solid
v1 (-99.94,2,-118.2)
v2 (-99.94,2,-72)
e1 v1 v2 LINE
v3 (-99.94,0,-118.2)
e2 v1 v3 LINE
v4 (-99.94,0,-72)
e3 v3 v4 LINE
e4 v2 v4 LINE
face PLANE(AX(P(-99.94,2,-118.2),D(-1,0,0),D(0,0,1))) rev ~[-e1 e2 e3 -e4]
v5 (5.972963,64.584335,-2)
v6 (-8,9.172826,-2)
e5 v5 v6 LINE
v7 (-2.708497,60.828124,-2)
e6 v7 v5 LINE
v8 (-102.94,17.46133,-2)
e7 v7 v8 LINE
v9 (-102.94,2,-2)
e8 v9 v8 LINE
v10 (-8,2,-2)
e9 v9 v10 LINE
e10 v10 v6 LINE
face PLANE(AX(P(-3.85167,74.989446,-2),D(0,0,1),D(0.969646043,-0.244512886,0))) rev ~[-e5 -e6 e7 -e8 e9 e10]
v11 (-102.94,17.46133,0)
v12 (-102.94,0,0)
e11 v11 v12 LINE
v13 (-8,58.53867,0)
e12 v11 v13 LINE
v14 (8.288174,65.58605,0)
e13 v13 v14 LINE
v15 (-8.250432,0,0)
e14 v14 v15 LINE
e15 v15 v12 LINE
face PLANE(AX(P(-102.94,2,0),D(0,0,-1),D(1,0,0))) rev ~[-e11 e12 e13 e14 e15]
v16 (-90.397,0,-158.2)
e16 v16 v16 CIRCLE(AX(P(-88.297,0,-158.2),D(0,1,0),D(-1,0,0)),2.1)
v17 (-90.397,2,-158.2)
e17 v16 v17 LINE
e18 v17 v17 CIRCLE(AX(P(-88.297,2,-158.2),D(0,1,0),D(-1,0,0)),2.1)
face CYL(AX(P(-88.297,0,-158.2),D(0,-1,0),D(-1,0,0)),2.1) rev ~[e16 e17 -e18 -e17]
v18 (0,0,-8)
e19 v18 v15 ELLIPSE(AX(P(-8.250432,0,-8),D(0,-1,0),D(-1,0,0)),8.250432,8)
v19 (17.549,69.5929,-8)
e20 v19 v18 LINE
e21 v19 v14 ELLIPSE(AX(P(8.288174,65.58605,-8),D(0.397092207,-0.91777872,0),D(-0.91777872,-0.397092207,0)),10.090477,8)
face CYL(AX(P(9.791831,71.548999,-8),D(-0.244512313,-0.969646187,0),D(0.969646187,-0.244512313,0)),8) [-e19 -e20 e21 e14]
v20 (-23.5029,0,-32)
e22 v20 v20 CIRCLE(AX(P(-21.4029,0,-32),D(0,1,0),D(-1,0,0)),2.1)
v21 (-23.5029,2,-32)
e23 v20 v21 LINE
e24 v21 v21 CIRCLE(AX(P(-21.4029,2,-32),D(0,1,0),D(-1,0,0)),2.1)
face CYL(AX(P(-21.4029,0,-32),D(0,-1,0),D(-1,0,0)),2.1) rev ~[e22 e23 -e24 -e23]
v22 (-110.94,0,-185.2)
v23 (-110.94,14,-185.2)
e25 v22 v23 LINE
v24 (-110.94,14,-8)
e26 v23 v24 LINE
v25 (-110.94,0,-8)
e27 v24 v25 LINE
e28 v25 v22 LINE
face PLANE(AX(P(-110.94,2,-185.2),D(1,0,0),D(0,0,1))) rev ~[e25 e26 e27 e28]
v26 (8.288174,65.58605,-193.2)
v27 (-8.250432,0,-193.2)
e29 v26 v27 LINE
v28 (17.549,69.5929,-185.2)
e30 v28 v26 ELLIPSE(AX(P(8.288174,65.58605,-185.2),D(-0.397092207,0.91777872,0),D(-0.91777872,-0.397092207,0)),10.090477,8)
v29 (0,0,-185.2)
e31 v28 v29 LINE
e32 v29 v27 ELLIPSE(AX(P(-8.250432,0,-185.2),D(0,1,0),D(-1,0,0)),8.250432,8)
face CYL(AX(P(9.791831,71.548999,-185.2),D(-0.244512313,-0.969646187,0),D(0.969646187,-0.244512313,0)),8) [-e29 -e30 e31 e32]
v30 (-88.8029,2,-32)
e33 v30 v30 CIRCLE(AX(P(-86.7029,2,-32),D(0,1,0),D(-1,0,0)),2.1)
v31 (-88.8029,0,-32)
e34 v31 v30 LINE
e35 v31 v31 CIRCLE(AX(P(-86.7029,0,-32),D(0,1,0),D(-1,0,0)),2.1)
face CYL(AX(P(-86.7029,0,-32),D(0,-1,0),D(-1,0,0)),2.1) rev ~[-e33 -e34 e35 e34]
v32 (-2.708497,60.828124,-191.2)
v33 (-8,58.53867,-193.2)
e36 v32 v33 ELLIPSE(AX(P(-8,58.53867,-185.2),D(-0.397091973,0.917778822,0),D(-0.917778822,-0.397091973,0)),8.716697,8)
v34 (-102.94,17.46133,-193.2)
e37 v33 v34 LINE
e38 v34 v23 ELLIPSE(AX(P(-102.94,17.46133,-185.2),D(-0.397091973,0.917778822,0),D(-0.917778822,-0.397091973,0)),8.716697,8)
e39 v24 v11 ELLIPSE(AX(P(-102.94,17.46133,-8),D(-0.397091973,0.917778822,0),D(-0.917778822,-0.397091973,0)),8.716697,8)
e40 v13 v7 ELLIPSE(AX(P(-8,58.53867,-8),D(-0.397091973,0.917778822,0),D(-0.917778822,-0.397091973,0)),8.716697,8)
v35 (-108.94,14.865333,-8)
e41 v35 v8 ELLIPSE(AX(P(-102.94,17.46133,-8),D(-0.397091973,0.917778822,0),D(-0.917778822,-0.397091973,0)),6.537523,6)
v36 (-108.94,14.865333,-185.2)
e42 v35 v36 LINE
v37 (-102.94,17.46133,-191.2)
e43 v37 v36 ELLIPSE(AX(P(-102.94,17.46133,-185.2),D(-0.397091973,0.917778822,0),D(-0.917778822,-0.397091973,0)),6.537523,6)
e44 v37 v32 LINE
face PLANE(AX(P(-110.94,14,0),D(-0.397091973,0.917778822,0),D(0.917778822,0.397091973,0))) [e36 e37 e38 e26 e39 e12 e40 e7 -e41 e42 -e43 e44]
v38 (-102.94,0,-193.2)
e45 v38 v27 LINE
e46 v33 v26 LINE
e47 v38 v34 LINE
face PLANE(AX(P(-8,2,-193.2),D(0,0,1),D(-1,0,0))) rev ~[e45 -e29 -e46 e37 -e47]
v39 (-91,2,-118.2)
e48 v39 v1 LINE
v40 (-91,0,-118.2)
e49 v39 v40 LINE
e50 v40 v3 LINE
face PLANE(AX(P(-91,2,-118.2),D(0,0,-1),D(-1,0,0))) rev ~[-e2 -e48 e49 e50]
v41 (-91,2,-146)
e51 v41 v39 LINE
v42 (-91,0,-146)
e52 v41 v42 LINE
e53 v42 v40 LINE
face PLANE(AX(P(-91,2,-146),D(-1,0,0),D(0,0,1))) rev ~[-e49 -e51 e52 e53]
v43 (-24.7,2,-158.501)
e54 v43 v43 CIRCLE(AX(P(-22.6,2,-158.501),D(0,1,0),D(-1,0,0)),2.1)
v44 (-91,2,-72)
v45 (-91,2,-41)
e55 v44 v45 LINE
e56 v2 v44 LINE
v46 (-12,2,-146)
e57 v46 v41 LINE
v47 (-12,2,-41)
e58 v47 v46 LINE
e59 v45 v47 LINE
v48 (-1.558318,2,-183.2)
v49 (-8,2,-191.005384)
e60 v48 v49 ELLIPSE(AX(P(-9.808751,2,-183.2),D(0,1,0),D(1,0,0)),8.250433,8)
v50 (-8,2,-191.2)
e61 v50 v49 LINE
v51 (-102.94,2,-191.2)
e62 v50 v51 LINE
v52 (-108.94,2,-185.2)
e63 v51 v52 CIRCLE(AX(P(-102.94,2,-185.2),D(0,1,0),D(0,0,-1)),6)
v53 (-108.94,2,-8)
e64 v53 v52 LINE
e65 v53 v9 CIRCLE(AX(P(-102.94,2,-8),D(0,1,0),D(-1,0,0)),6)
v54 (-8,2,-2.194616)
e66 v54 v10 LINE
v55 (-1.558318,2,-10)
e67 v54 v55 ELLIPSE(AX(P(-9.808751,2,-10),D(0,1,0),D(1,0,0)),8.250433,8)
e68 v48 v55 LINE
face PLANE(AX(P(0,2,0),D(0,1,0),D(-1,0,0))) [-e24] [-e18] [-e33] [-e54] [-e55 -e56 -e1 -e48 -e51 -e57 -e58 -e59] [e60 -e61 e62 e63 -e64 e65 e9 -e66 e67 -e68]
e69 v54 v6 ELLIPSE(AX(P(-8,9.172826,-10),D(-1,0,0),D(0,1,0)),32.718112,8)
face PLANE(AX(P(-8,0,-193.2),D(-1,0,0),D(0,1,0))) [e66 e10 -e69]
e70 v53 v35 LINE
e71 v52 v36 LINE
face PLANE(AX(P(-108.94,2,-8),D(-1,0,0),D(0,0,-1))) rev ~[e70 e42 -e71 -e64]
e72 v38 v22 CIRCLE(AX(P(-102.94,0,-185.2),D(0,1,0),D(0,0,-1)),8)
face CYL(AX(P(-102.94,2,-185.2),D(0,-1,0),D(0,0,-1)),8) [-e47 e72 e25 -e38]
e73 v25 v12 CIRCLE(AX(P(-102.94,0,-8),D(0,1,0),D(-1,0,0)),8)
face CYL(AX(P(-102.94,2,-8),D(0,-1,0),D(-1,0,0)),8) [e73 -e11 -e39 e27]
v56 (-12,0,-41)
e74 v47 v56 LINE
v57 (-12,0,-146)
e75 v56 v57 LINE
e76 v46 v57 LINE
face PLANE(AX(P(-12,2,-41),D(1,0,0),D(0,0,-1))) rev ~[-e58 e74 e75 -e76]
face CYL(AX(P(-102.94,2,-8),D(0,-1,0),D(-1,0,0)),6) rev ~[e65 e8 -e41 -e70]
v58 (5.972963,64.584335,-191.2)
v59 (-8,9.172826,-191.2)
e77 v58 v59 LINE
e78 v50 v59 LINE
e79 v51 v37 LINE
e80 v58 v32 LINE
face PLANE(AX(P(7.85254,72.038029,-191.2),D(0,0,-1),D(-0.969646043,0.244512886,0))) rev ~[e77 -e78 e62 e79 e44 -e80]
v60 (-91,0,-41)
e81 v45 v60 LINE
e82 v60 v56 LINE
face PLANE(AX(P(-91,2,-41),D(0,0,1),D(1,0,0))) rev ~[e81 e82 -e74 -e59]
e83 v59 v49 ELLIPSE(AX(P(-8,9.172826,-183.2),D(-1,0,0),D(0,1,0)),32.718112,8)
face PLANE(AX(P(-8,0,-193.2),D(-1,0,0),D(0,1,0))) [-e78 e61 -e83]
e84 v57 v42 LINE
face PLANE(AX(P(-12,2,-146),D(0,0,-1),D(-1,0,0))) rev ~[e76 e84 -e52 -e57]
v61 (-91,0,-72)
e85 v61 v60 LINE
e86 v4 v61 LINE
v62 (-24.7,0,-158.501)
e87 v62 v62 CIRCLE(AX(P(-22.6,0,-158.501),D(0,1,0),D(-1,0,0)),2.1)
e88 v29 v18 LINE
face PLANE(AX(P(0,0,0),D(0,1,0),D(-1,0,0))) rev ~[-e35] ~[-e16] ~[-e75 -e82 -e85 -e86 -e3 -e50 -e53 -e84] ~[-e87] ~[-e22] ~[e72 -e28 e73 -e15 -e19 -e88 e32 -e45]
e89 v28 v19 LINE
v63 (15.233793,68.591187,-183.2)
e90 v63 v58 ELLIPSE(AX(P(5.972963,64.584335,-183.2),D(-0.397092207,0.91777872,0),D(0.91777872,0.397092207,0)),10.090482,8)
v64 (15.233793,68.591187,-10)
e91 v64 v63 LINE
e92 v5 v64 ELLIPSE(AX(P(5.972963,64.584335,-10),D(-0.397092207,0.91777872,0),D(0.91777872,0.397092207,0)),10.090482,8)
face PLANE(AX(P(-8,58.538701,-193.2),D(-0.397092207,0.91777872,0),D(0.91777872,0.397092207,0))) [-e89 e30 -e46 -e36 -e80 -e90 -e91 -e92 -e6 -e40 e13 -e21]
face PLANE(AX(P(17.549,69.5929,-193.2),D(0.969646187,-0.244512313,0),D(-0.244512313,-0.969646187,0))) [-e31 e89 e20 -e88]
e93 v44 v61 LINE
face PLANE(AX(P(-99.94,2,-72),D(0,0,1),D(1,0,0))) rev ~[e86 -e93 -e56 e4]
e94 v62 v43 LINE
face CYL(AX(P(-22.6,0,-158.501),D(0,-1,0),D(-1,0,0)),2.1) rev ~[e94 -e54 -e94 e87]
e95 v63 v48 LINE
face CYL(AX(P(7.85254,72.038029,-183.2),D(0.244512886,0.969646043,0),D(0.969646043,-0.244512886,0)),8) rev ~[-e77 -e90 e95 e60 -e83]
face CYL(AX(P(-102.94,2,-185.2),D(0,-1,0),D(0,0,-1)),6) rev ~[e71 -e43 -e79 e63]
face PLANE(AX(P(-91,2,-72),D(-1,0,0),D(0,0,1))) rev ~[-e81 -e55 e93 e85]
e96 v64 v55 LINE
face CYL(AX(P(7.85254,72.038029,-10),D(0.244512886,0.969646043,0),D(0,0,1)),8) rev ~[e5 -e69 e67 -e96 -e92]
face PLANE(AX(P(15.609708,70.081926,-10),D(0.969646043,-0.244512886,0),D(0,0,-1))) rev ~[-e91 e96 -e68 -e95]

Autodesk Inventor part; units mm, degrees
ref_plane "YZ Plane" through (0, 0, 0) normal (1, 0, 0) x (0, 1, 0)
ref_plane "XZ Plane" through (0, 0, 0) normal (0, 1, 0) x (-1, 0, 0)
sketch "Sketch1" plane through (0, 0, 0) normal (0, 1, 0) x (-1, 0, 0)
  line L0 (8, 0) -> (102.94, 0)
  line L1 (110.94, -8) -> (110.94, -185.2)
  line L2 (102.94, -193.2) -> (8, -193.2)
  line L3 (0, -185.2) -> (0, -8)
  circle A0 centre (86.7029, -32) radius 2.1
  circle A1 centre (88.297, -158.2) radius 2.1
  circle A2 centre (22.6, -158.501) radius 2.1
  circle A3 centre (21.4029, -32) radius 2.1
  arc A4 (110.94, -8) -> (102.94, 0) centre (102.94, -8) ccw
  arc A5 (8, 0) -> (0, -8) centre (8, -8) ccw
  arc A6 (0, -185.2) -> (8, -193.2) centre (8, -185.2) ccw
  arc A7 (102.94, -193.2) -> (110.94, -185.2) centre (102.94, -185.2) ccw
  point P0 (0, 0)
  dimension "d0" = 110.94
  dimension "d1" = 193.2
  dimension "d2" = 4.2
  dimension "d3" = 4.2
  dimension "d4" = 65.3
  dimension "d5" = 65.697
  dimension "d6" = 4.2
  dimension "d7" = 4.2
  dimension "d8" = 126.2
  dimension "d9" = 126.501
  dimension "d10" = 0
  dimension "d11" = 22.6
  dimension "d12" = 35
  dimension "d13" = 8
extrude "Extrusion1" add sketch "Sketch1" along normal blind 2
sketch "Sketch3" plane through (0, 2, 0) normal (0, 1, 0) x (1, 0, 0)
  line L0 (-91, 41) -> (-12, 41)
  line L1 (-12, 41) -> (-12, 146)
  line L2 (-12, 146) -> (-91, 146)
  line L3 (-99.94, 72) -> (-91, 72)
  line L4 (-91, 118.2) -> (-99.94, 118.2)
  line L5 (-99.94, 118.2) -> (-99.94, 72)
  circle A0 centre (-88.297, 158.2) radius 2.1 projected
  circle A1 centre (-86.7029, 32) radius 2.1 projected
  line L6 (-91, 146) -> (-91, 118.2)
  line L7 (-91, 72) -> (-91, 41)
  line L8 (-102.94, 0) -> (-8, 0) projected
  line L9 (0, 8) -> (0, 185.2) projected
  line L10 (-110.94, 185.2) -> (-110.94, 8) projected
  point P0 (0, 0)
  dimension "d22" = 105
  dimension "d26" = 40
  dimension "d27" = 40
  dimension "d32" = 12
  dimension "d33" = 41
  dimension "d34" = 11
  dimension "d35" = 79
  dimension "d36" = 79
extrude "Extrusion3" cut sketch "Sketch3" against normal blind 7.5 contours L7 L3 L5 L4 L6 L2 L1 L0
sketch "Sketch4" plane through (0, 2, 0) normal (0, 1, 0) x (1, 0, 0)
  line L0 (-91, 146) -> (-12, 146) projected
  line L1 (-12, 146) -> (-12, 41) projected
  line L2 (-12, 41) -> (-91, 41) projected
  line L3 (-91, 41) -> (-91, 72) projected
  line L4 (-91, 72) -> (-99.94, 72) projected
  line L5 (-99.94, 72) -> (-99.94, 118.2) projected
  line L6 (-99.94, 118.2) -> (-91, 118.2) projected
  line L7 (-91, 118.2) -> (-91, 146) projected
  line L8 (-8, 193.2) -> (-102.94, 193.2) projected
  arc A0 (-102.94, 193.2) -> (-110.94, 185.2) centre (-102.94, 185.2) ccw projected
  line L9 (-110.94, 185.2) -> (-110.94, 8) projected
  arc A1 (-110.94, 8) -> (-102.94, 0) centre (-102.94, 8) ccw projected
  line L10 (-102.94, 0) -> (-8, 0) projected
  arc A2 (-8, 0) -> (0, 8) centre (-8, 8) ccw projected
  line L11 (0, 8) -> (0, 185.2) projected
  arc A3 (0, 185.2) -> (-8, 193.2) centre (-8, 185.2) ccw projected
  circle A4 centre (-86.7029, 32) radius 2.1 projected
  circle A5 centre (-88.297, 158.2) radius 2.1 projected
  circle A6 centre (-22.6, 158.501) radius 2.1 projected
  circle A7 centre (-21.4029, 32) radius 2.1 projected
  arc A8 (-108.94, 8) -> (-102.94, 2) centre (-102.94, 8) ccw
  line L12 (-108.94, 8) -> (-108.94, 185.2)
  arc A9 (-102.94, 191.2) -> (-108.94, 185.2) centre (-102.94, 185.2) ccw
  line L13 (-102.94, 191.2) -> (-8, 191.2)
  arc A10 (-2, 185.2) -> (-8, 191.2) centre (-8, 185.2) ccw
  line L14 (-2, 185.2) -> (-2, 8)
  arc A11 (-8, 2) -> (-2, 8) centre (-8, 8) ccw
  line L15 (-8, 2) -> (-102.94, 2)
  point P0 (0, 0)
  dimension "d37" = 2
extrude "Extrusion4" add sketch "Sketch4" along normal blind 60 contours A3 L11 A2 L10 A1 L9 A0 L8
sketch "Sketch5" plane through (-102.94, 0, 0) normal (0, 0, 1) x (1, 0, 0)
  line L0 (-8, 0) -> (-8, 62) projected
  line L1 (-8, 14) -> (102.94, 62)
  line L2 (102.94, 0) -> (102.94, 62) projected
  line L3 (0, 0) -> (-8, 0) projected
  line L4 (0, 62) -> (-8, 62) projected
  line L5 (-8, 14) -> (-8, 62)
  line L6 (102.94, 62) -> (94.94, 62) projected
  line L7 (-8, 62) -> (102.94, 62)
  dimension "d40" = 14
  dimension "d41" = 0
extrude "Extrusion5" cut sketch "Sketch5" along normal mid plane 1000
sketch "Sketch6" plane through (-8, 0, -193.2) normal (0, 0, -1) x (-1, 0, 0)
  line L0 (102.94, 0) -> (102.94, 14) projected
  line L1 (102.94, 14) -> (-25.549, 69.5929)
  line L2 (94.94, 17.4613) -> (102.94, 14) projected
  line L3 (-25.549, 69.5929) -> (-8, 0)
  line L4 (0, 0) -> (-8, 0) projected
  line L5 (-8, 0) -> (0, 0)
  line L6 (0, 0) -> (0, 58.5387) projected
  line L7 (0, 0) -> (0, 58.5387)
  point P0 (-8, 62)
  dimension "d47" = 140
extrude "Extrusion6" add sketch "Sketch6" against normal blind 193.2
fillet "Fillet1" radius 8 2 edges at (8.7745, 34.7964, -193.2) (8.7745, 34.7964, 0)
ref_plane "Work Plane1" through (17.549, 69.5929, -193.2) normal (0.2445129, 0.9696461, 0) x (0, 0, 1)
sketch "Sketch9" plane through (17.549, 69.5929, -193.2) normal (0.2445129, 0.9696461, 0) x (0, 0, 1)
  line L0 (2, -22.0706) -> (191.2, -22.0706) projected
  line L1 (191.2, -100.3044) -> (191.2, -8.2462) projected
  line L2 (2, -22.0706) -> (191.2, -22.0706)
  line L3 (191.2, -22.0706) -> (191.2, -10)
  line L4 (183.2, -2) -> (10, -2)
  line L5 (2, -10) -> (2, -22.0706)
  line L6 (8, 0) -> (185.2, 0) projected
  arc A0 (191.2, -10) -> (183.2, -2) centre (183.2, -10) ccw
  arc A1 (10, -2) -> (2, -10) centre (10, -10) ccw
  point P0 (193.2, 0)
  point P1 (191.2, -2)
  dimension "d55" = 2
  dimension "d56" = 8
extrude "Extrusion7" cut sketch "Sketch9" against normal up to surface surface through (-55.47, 2, -96.6) normal (0, 1, 0)
sketch "Sketch10" plane through (-110.94, 14, -8) normal (-0.397092, 0.9177788, 0) x (0.9177788, 0.397092, 0)
  line L0 (8.7167, -6) -> (127.3869, -6) projected
  ellipse E0 centre (8.7167, 0) end of major axis (15.2542, 0) minor radius 6 (2.1792, 0) -> (8.7167, -6) ccw projected
  line L1 (2.1792, 177.2) -> (2.1792, 0) projected
  ellipse E1 centre (8.7167, 177.2) end of major axis (15.2542, 177.2) minor radius 6 (8.7167, 183.2) -> (2.1792, 177.2) ccw projected
  line L2 (127.3869, 183.2) -> (8.7167, 183.2) projected
  ellipse E2 centre (127.3869, 175.2) end of major axis (137.4774, 175.2) minor radius 8 (137.4774, 175.2) -> (127.3869, 183.2) ccw projected
  line L3 (137.4774, 175.2) -> (137.4774, 2) projected
  ellipse E3 centre (127.3869, 2) end of major axis (117.2964, 2) minor radius 8 (127.3869, -6) -> (137.4774, 2) ccw projected
  ellipse E4 centre (129.9095, 0) end of major axis (140, 0) minor radius 8 (129.9095, -8) -> (140, 0) ccw projected
  line L4 (140, 177.2) -> (140, 0) projected
  ellipse E5 centre (129.9095, 177.2) end of major axis (140, 177.2) minor radius 8 (140, 177.2) -> (129.9095, 185.2) ccw projected
  line L5 (8.7167, 185.2) -> (129.9095, 185.2) projected
  ellipse E6 centre (8.7167, 177.2) end of major axis (0, 177.2) minor radius 8 (8.7167, 185.2) -> (0, 177.2) ccw projected
  line L6 (0, 0) -> (0, 177.2) projected
  ellipse E7 centre (8.7167, 0) end of major axis (0, 0) minor radius 8 (0, 0) -> (8.7167, -8) ccw projected
  line L7 (129.9095, -8) -> (8.7167, -8) projected
  point P0 (96.2591, -8)
properties part number "Front"
